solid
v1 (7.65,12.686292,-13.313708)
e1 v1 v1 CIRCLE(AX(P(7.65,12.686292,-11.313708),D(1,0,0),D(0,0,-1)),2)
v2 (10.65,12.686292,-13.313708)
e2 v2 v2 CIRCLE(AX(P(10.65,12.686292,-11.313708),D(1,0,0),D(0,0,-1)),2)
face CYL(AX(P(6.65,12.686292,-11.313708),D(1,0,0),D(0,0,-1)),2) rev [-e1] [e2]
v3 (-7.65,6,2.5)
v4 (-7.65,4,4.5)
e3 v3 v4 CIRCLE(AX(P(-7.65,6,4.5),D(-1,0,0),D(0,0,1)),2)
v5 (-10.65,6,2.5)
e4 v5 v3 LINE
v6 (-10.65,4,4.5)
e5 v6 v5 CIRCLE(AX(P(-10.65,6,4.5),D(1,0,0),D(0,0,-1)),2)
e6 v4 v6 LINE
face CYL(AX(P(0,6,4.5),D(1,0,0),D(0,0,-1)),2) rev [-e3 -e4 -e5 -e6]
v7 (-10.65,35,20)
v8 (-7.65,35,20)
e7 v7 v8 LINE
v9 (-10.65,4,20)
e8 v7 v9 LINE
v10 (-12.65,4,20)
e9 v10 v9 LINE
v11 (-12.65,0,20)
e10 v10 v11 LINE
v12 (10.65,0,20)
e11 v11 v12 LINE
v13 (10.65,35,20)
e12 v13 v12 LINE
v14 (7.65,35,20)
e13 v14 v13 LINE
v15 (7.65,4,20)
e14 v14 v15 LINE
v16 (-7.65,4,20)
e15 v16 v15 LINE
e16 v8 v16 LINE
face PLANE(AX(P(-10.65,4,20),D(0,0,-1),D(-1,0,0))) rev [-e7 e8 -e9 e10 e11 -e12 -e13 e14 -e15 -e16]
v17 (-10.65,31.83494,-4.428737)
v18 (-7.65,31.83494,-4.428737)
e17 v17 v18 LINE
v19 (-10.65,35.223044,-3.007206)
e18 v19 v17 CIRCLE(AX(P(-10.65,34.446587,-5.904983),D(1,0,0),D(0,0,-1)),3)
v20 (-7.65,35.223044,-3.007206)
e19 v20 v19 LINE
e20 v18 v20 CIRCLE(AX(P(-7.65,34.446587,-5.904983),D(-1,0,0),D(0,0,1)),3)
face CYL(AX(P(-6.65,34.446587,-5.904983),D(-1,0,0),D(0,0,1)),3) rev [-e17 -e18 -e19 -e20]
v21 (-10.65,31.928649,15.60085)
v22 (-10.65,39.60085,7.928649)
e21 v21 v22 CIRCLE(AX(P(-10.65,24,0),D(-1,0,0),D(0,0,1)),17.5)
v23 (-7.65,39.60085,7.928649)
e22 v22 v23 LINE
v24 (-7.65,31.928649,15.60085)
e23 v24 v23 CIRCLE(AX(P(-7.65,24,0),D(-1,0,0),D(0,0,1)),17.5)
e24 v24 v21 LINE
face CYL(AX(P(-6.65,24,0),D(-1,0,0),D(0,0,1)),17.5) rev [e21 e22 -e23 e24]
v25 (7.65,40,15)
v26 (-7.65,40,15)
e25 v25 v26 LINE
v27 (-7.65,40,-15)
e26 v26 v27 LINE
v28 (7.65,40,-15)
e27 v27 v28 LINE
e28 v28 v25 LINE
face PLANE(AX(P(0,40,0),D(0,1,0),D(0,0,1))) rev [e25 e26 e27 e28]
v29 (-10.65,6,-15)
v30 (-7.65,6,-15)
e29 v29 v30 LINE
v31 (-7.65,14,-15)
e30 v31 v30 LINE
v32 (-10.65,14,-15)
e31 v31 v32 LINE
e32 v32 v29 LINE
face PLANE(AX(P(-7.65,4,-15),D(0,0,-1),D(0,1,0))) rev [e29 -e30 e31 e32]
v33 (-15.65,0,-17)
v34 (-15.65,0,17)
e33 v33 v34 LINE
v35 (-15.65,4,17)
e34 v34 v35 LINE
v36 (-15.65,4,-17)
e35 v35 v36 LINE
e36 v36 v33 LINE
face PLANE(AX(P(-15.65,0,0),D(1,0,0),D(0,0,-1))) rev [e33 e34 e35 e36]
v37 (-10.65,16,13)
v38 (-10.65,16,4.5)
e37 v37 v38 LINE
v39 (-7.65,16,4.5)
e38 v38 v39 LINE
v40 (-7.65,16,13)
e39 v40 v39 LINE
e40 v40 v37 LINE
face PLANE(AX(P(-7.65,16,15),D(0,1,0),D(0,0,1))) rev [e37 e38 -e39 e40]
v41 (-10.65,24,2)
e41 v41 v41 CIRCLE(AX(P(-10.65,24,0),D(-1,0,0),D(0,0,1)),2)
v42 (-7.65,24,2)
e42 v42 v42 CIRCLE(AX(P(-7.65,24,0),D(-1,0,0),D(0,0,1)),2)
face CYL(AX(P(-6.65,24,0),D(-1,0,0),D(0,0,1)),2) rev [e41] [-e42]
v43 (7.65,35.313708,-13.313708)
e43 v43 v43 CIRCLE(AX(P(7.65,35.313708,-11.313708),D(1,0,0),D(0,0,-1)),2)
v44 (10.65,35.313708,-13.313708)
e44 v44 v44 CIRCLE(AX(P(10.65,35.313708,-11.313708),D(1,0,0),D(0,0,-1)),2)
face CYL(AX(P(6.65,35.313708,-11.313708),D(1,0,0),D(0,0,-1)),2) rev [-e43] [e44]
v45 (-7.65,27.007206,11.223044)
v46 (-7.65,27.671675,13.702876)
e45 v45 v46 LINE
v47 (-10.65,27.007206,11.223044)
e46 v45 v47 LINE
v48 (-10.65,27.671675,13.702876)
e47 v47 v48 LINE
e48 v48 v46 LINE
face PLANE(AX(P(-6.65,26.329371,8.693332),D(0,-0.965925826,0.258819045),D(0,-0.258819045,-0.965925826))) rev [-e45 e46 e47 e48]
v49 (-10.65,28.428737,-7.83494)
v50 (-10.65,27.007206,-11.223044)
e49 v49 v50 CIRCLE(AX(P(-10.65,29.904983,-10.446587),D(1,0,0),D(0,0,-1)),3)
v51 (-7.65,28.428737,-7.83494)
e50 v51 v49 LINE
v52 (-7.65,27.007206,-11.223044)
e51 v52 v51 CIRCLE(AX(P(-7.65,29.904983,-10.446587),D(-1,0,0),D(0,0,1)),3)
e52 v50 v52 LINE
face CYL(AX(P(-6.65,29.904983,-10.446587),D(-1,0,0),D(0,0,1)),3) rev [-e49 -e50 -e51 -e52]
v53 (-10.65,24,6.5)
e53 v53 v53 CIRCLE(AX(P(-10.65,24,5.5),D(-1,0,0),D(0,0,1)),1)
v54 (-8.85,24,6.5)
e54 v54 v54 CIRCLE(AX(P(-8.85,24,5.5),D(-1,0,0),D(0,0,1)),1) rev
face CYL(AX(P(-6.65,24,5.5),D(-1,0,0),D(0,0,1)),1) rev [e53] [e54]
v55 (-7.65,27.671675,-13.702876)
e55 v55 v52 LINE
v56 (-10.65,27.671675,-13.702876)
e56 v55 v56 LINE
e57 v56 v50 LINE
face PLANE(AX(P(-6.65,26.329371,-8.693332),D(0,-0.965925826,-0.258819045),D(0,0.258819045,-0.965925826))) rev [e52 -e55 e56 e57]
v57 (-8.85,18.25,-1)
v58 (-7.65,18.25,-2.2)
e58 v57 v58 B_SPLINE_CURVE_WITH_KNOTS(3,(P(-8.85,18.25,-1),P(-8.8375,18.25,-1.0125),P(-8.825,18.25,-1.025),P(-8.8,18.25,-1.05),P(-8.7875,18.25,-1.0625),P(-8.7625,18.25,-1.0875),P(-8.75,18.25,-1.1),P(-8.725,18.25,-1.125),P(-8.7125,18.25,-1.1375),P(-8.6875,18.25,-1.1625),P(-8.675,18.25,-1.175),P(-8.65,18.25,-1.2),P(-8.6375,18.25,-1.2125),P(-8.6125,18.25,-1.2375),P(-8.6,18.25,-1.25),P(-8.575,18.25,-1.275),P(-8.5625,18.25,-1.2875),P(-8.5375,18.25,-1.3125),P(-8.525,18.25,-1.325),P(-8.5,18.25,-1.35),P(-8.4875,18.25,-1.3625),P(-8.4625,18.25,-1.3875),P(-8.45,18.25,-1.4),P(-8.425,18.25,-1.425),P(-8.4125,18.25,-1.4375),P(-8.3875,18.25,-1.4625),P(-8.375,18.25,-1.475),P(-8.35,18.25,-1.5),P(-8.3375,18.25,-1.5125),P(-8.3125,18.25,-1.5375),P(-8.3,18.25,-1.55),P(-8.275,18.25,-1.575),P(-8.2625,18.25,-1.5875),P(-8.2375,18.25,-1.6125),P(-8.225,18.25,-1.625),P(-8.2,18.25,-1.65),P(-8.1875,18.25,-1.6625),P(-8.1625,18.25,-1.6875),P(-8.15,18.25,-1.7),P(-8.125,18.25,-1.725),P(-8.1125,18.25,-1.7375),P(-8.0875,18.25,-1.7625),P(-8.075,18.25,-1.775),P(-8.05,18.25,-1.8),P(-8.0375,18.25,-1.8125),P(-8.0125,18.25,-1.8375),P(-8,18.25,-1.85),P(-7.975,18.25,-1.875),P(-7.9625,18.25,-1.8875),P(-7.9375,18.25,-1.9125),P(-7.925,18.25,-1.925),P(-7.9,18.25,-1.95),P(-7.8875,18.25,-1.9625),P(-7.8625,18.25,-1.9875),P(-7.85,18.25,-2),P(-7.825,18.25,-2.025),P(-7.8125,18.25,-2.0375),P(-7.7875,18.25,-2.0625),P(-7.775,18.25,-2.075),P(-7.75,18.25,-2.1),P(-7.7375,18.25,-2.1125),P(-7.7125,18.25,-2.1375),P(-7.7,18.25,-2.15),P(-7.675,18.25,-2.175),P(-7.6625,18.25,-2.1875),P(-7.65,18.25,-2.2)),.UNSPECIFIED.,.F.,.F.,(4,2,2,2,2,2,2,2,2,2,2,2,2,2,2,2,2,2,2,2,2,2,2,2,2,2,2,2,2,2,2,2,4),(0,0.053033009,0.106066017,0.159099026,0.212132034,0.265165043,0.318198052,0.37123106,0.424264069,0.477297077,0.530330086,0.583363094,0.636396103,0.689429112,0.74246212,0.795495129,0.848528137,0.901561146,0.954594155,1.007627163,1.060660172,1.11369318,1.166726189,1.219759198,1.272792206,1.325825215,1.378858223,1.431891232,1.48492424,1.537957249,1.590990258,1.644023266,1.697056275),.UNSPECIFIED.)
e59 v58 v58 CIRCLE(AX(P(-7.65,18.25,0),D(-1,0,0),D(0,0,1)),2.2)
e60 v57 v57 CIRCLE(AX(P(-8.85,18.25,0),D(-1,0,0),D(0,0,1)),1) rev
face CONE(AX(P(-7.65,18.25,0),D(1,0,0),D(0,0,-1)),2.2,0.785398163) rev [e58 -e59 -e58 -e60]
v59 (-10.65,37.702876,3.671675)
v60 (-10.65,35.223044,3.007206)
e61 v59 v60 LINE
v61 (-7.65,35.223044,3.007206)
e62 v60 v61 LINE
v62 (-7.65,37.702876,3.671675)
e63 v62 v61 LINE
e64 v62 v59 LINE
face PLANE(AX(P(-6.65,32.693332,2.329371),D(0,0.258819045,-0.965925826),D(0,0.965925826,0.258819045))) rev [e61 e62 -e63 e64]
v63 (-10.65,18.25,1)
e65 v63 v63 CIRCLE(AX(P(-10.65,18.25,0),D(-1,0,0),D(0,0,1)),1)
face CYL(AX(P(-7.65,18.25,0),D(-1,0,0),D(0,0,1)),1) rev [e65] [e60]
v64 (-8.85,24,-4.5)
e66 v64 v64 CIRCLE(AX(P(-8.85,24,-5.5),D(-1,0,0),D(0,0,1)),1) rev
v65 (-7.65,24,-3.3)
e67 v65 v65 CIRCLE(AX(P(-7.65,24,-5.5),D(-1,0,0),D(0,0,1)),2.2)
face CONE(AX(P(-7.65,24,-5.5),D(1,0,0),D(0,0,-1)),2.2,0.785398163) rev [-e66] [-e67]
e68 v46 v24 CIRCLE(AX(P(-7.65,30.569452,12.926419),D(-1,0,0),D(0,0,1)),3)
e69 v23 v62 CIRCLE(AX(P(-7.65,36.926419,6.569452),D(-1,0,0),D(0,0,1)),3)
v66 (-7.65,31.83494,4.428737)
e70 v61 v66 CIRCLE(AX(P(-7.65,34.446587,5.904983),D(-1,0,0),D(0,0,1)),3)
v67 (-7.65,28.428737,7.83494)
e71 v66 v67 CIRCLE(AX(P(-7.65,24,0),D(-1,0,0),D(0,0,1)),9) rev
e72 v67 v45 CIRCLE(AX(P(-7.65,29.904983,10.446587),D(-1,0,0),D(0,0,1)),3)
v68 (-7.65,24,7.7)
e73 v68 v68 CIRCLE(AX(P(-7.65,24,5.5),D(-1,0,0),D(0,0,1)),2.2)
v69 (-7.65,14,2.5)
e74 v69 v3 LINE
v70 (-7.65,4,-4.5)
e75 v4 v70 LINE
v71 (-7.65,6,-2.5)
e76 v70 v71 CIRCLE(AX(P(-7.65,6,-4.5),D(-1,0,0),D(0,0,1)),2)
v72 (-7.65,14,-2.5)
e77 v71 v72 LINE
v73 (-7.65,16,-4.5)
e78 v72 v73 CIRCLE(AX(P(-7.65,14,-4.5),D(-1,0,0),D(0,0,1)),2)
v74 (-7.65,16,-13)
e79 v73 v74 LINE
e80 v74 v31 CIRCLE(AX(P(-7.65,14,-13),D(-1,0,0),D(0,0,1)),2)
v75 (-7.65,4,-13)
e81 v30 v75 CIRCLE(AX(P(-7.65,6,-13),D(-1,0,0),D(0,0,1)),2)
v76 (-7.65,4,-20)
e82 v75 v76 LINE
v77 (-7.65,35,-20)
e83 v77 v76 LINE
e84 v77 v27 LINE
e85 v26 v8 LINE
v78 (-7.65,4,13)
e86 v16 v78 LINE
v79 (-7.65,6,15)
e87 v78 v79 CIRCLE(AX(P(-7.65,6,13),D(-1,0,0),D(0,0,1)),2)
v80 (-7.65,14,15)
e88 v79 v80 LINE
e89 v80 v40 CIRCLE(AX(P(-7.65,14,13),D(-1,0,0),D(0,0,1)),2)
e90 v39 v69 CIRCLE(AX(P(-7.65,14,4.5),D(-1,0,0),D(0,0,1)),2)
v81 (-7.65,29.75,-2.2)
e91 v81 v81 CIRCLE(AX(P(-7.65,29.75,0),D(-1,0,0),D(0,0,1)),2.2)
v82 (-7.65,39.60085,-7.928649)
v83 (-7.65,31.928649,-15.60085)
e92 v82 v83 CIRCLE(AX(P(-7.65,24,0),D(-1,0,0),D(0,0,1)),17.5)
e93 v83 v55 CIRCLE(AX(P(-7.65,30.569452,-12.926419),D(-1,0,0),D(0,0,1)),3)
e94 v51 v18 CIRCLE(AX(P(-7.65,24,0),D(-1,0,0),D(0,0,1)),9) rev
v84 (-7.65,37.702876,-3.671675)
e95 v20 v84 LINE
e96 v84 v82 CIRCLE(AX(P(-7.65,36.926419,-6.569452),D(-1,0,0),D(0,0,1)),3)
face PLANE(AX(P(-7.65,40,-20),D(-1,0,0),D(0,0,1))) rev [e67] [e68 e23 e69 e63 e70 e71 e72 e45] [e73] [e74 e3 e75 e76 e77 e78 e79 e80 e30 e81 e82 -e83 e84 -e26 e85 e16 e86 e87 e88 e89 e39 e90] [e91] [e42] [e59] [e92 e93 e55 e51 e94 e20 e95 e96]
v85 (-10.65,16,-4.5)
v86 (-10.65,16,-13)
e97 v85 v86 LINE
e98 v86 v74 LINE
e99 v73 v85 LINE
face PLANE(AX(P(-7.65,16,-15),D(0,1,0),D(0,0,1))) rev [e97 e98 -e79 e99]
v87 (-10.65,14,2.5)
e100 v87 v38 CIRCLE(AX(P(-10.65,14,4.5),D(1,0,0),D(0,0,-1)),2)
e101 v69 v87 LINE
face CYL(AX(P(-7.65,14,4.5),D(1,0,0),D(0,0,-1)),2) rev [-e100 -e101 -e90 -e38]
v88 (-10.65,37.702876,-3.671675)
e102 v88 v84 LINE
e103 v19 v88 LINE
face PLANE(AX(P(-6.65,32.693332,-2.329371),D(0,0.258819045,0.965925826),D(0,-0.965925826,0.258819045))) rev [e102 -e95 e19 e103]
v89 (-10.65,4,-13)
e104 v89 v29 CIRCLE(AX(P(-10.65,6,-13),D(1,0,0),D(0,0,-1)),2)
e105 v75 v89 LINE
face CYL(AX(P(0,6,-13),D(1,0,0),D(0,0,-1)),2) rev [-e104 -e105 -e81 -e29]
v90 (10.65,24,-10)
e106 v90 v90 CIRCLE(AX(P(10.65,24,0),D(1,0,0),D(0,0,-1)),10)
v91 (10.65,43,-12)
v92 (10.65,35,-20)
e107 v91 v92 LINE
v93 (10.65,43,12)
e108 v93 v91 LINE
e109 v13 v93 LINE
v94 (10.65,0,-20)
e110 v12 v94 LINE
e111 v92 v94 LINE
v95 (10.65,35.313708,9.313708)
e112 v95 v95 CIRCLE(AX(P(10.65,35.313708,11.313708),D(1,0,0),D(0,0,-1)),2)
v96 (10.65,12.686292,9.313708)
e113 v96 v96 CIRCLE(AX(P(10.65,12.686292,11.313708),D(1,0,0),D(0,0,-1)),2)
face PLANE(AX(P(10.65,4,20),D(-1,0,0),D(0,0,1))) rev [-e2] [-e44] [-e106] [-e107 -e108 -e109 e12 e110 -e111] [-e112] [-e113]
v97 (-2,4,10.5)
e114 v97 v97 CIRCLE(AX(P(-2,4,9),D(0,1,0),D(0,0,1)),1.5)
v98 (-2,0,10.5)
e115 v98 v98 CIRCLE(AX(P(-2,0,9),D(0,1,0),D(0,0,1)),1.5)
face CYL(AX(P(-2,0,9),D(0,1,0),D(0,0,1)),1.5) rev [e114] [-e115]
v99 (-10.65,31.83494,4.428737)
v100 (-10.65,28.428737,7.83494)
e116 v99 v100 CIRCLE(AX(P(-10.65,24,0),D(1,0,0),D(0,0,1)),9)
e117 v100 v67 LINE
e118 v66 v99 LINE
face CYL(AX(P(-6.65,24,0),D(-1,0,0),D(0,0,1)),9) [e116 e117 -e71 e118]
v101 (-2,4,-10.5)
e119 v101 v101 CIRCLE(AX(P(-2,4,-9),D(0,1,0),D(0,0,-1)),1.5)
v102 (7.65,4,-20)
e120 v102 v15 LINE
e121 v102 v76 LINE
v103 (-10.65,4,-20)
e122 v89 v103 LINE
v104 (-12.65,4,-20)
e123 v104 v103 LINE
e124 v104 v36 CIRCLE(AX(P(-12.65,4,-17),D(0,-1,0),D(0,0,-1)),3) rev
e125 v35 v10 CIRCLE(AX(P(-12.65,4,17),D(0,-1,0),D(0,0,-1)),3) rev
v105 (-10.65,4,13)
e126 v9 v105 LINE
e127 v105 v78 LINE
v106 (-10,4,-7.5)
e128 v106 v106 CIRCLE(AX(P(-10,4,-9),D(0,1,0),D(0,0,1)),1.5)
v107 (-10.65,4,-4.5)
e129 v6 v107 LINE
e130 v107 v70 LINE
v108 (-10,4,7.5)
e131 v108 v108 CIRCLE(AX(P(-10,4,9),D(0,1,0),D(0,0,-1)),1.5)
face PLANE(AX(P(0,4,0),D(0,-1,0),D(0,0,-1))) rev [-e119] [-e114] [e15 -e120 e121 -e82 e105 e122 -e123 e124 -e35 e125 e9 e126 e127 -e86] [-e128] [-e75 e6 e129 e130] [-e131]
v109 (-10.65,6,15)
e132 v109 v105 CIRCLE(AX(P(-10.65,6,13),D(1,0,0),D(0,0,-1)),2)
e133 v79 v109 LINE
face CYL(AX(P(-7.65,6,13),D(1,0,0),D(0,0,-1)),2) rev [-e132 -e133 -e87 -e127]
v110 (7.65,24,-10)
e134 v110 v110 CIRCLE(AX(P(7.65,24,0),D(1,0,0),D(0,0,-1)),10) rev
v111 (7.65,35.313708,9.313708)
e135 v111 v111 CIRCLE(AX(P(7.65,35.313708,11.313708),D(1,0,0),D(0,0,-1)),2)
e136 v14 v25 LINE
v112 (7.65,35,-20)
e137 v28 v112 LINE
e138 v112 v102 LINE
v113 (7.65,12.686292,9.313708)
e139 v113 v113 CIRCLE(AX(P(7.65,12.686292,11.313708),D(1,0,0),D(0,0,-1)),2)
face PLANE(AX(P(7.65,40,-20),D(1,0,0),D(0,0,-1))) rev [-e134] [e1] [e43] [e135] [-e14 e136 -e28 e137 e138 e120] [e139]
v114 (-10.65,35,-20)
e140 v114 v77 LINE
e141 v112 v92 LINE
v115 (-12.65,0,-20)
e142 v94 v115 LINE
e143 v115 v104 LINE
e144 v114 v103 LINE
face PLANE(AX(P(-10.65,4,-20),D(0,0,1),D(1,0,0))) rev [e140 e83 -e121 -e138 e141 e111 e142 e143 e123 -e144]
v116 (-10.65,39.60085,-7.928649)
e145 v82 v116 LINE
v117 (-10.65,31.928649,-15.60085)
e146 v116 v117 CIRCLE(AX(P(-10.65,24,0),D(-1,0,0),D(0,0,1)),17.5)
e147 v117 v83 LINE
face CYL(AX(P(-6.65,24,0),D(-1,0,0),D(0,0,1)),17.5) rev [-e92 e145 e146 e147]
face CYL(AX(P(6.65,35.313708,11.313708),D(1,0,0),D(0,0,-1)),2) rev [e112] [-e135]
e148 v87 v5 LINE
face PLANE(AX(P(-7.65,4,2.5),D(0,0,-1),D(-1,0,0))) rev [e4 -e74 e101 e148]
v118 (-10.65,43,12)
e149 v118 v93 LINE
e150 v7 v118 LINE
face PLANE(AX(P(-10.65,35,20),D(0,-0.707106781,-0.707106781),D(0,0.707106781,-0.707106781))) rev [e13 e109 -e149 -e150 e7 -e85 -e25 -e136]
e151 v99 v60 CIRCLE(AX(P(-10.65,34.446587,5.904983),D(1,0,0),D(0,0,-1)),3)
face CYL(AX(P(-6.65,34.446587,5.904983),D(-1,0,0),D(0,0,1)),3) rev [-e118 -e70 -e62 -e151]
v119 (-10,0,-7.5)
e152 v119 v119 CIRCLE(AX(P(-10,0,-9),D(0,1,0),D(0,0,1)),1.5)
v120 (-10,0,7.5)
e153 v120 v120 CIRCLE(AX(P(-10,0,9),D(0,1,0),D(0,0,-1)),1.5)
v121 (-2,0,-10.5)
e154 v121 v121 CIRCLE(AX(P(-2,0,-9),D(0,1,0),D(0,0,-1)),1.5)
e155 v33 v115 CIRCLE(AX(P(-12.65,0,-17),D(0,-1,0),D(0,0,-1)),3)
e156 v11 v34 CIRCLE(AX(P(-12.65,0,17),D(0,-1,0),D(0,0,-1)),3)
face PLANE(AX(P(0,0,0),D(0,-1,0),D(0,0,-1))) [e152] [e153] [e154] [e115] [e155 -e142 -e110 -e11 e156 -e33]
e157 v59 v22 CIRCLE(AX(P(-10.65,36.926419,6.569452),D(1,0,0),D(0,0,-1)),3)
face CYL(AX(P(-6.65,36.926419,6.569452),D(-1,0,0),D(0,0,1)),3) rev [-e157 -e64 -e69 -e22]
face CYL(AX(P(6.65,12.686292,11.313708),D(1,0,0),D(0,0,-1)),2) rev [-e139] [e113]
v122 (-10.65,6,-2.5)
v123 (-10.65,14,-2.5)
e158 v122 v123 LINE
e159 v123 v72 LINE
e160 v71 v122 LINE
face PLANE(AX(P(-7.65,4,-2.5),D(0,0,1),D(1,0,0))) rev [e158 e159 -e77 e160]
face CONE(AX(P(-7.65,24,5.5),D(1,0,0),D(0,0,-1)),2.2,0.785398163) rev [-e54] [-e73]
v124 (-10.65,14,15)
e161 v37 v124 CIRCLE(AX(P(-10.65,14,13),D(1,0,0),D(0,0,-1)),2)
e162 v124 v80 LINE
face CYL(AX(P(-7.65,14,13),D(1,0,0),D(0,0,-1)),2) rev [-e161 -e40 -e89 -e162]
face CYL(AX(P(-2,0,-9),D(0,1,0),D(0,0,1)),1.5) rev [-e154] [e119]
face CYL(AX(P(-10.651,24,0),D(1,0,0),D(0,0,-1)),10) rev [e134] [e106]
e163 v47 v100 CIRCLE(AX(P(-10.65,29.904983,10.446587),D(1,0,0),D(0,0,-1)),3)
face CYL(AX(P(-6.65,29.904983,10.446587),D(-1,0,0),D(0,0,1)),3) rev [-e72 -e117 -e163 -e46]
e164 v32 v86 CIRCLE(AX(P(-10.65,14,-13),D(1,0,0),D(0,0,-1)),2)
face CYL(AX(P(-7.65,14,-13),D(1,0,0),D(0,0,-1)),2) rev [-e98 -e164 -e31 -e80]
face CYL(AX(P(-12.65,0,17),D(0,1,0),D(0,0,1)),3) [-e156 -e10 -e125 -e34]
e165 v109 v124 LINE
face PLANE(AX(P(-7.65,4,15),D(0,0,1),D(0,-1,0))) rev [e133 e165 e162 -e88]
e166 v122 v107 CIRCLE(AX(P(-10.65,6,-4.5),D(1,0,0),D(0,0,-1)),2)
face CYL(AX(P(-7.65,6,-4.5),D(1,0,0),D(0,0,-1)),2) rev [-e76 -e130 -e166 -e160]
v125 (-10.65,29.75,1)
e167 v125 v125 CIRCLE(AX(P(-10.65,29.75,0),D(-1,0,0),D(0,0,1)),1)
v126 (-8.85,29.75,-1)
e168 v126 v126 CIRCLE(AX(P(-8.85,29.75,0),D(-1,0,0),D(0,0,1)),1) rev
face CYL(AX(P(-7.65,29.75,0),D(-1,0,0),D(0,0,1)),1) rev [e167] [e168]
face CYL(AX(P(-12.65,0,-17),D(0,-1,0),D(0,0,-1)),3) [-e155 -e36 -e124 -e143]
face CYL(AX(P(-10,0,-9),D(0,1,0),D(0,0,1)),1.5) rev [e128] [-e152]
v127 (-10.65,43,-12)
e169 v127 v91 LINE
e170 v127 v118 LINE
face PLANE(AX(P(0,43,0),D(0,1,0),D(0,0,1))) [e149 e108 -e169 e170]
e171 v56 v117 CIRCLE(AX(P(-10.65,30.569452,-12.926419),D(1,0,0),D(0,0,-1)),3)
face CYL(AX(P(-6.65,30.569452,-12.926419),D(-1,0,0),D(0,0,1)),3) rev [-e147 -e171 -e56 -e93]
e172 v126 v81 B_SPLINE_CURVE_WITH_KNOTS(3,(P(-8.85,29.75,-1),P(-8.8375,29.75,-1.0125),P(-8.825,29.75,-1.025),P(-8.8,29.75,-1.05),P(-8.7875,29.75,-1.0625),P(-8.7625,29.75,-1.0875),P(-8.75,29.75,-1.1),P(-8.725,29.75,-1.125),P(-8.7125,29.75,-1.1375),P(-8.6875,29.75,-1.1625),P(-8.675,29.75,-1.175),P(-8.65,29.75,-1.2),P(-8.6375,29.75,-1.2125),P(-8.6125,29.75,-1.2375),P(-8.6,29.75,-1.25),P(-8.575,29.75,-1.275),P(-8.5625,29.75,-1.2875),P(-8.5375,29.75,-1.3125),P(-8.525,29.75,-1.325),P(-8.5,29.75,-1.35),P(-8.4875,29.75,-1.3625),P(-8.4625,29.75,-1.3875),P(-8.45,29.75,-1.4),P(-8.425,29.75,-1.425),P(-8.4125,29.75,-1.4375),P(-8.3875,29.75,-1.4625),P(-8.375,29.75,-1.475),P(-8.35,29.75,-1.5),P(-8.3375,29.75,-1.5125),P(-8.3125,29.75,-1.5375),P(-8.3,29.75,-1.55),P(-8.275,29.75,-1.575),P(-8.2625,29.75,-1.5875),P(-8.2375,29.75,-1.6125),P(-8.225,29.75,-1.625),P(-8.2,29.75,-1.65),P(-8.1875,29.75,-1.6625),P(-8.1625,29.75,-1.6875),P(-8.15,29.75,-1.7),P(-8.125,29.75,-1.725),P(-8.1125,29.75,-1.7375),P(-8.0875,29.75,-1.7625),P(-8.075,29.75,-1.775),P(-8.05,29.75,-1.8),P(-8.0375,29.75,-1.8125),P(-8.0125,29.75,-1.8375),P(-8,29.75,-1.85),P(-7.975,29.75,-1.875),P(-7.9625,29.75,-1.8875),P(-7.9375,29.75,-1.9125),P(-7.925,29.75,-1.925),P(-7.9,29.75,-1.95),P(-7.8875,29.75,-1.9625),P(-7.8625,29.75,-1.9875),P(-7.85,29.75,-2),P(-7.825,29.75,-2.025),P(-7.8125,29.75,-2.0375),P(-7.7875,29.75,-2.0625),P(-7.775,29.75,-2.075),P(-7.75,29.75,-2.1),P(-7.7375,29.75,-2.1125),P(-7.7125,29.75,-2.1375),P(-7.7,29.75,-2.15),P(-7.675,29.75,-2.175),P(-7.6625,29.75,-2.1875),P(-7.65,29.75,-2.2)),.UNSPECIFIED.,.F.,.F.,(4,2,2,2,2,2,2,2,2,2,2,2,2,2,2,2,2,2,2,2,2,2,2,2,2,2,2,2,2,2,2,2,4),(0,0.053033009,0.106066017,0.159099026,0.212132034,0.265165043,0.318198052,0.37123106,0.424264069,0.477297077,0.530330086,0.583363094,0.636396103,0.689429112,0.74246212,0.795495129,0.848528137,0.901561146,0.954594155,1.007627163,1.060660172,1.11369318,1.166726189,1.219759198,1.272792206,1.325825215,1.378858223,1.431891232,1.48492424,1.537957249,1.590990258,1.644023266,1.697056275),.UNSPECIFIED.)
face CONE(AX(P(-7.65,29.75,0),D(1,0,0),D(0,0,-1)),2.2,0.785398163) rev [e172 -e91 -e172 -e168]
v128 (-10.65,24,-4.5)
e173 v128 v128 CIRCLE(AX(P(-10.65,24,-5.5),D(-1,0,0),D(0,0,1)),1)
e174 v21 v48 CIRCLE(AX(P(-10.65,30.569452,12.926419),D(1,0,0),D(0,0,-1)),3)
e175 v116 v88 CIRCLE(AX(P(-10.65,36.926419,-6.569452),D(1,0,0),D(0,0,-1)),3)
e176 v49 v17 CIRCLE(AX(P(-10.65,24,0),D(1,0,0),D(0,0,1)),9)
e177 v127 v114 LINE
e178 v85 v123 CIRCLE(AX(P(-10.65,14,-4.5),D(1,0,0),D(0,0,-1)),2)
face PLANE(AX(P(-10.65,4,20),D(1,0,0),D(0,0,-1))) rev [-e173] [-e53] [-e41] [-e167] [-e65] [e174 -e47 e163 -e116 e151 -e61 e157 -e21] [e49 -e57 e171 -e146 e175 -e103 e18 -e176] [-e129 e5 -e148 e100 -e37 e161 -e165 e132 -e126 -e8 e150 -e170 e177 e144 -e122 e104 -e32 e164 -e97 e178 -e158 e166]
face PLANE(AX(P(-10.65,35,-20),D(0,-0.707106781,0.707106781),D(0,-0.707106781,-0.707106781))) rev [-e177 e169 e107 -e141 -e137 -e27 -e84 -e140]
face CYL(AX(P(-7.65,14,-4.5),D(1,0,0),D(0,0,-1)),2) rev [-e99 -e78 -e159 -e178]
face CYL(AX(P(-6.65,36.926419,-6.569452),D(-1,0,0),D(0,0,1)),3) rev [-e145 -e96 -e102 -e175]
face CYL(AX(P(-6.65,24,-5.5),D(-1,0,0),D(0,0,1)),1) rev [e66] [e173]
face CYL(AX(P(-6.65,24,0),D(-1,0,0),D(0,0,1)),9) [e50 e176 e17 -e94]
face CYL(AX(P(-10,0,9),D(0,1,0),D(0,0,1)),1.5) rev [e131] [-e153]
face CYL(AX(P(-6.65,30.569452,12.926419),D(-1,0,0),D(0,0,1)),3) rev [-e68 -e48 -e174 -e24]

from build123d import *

# Parameters (mm, degrees)
SKETCH_1_W          = 21.3
SKETCH_1_H          = 40
EXTRUDE_1_DEPTH     = 4
SKETCH_2_W          = 3
SKETCH_2_H          = 40
EXTRUDE_2_DEPTH     = 36
SKETCH_3_W          = 21.3
SKETCH_3_H          = 40
EXTRUDE_3_DEPTH     = 3
CUT_EXTRUDE_1_REACH = 53.987
SKETCH_4_R          = 10
CUT_EXTRUDE_2_DEPTH = 52.98740232
SKETCH_13_W         = 40
SKETCH_13_H         = 4
EXTRUDE_4_DEPTH     = 5
SKETCH_6_R          = 1.5
CUT_EXTRUDE_3_DEPTH = 47.539472494
SKETCH_7_R          = 2
CUT_EXTRUDE_4_DEPTH = 4
SKETCH_9_R          = 2
SKETCH_9_R_2        = 1
CUT_EXTRUDE_6_DEPTH = 4
CUT_EXTRUDE_7_DEPTH = 4
FILLET_1_R          = 3
SKETCH_11_W         = 12.5
SKETCH_11_H         = 12
CUT_EXTRUDE_8_DEPTH = 3
FILLET_2_R          = 2
SKETCH_12_R         = 1
CUT_EXTRUDE_9_DEPTH = 3
CHAMFER_1_SIZE      = 1.2
FILLET_3_R          = 3


with BuildPart() as part:
    # 草图1 → 凸台-拉伸1 (new body)
    with BuildSketch(Plane(origin=(0, 0, 0), x_dir=(1, 0, 0), z_dir=(0, 1, 0))):
        Rectangle(SKETCH_1_W, SKETCH_1_H)
    extrude(amount=EXTRUDE_1_DEPTH)

    # 草图2 → 凸台-拉伸2 (add)
    with BuildSketch(Plane(origin=(0, 4, 0), x_dir=(1, 0, 0), z_dir=(0, 1, 0))):
        with Locations((-9.15, 0)):
            Rectangle(SKETCH_2_W, SKETCH_2_H)
        with Locations((9.15, 0)):
            Rectangle(SKETCH_2_W, SKETCH_2_H)
    extrude(amount=EXTRUDE_2_DEPTH)

    # 草图3 → 凸台-拉伸3 (add)
    with BuildSketch(Plane(origin=(0, 40, 0), x_dir=(1, 0, 0), z_dir=(0, 1, 0))):
        Rectangle(SKETCH_3_W, SKETCH_3_H)
    extrude(amount=EXTRUDE_3_DEPTH)

    # 草图4 → 切除-拉伸1 (cut, up to next)
    with BuildSketch(Plane(origin=(10.65, 0, 0), x_dir=(0, 0, -1), z_dir=(1, 0, 0)), mode=Mode.PRIVATE) as cut_extrude_1_sk1:
        with Locations((0, 24)):
            Circle(SKETCH_4_R)
    cut_extrude_1_tool1 = extrude(cut_extrude_1_sk1.sketch, amount=-CUT_EXTRUDE_1_REACH, mode=Mode.PRIVATE) & part.part
    add(cut_extrude_1_tool1.solids().sort_by_distance((10.65, 24, 0))[0], mode=Mode.SUBTRACT)

    # 草图5 → 切除-拉伸2 (cut, through all)
    with BuildSketch(Plane(origin=(10.65, 0, 0), x_dir=(0, 0, -1), z_dir=(1, 0, 0))):
        Polygon((-20, 35), (-12, 43), (-20, 43), align=None)
        Polygon((20, 35), (20, 43), (12, 43), align=None)
    extrude(amount=-CUT_EXTRUDE_2_DEPTH, mode=Mode.SUBTRACT)

    # 草图13 → 凸台-拉伸4 (add)
    with BuildSketch(Plane.ZY.offset(10.65)):
        with Locations((0, 2)):
            Rectangle(SKETCH_13_W, SKETCH_13_H)
    extrude(amount=EXTRUDE_4_DEPTH)

    # 草图6 → 切除-拉伸3 (cut, through all)
    with BuildSketch(Plane(origin=(0, 4, 0), x_dir=(1, 0, 0), z_dir=(0, 1, 0))):
        with Locations(Location((-10, 9, 0), (0, 0, 270))):
            Circle(SKETCH_6_R)
        with Locations(Location((-2, 9, 0), (0, 0, 90))):
            Circle(SKETCH_6_R)
        with Locations(Location((-2, -9, 0), (0, 0, 270))):
            Circle(SKETCH_6_R)
        with Locations(Location((-10, -9, 0), (0, 0, 244.320711381))):
            Circle(SKETCH_6_R)
    extrude(amount=-CUT_EXTRUDE_3_DEPTH, mode=Mode.SUBTRACT)

    # 草图7 → 切除-拉伸4 (cut)
    with BuildSketch(Plane(origin=(10.65, 0, 0), x_dir=(0, 0, -1), z_dir=(1, 0, 0))):
        with Locations((-11.313708499, 35.313708499)):
            Circle(SKETCH_7_R)
        with Locations((11.313708499, 35.313708499)):
            Circle(SKETCH_7_R)
        with Locations((11.313708499, 12.686291501)):
            Circle(SKETCH_7_R)
        with Locations((-11.313708499, 12.686291501)):
            Circle(SKETCH_7_R)
    extrude(amount=-CUT_EXTRUDE_4_DEPTH, mode=Mode.SUBTRACT)

    # 草图9 → 切除-拉伸6 (cut)
    with BuildSketch(Plane.ZY.offset(10.65)):
        with Locations((0, 24)):
            Circle(SKETCH_9_R)
        with Locations((-5.5, 24)):
            Circle(SKETCH_9_R_2)
        with Locations((5.5, 24)):
            Circle(SKETCH_9_R_2)
    extrude(amount=-CUT_EXTRUDE_6_DEPTH, mode=Mode.SUBTRACT)

    # 草图10 → 切除-拉伸7 (cut)
    with BuildSketch(Plane.ZY.offset(10.65)):
        with BuildLine():
            Line((-2.329371406, 32.693332437), (-4.529333289, 40.90370196))
            ThreePointArc((-4.529333289, 40.90370196), (-12.374368671, 36.374368671), (-16.90370196, 28.529333289))
            Line((-16.90370196, 28.529333289), (-8.693332437, 26.329371406))
            ThreePointArc((-8.693332437, 26.329371406), (-6.363961031, 30.363961031), (-2.329371406, 32.693332437))
        make_face()
        with BuildLine():
            Line((2.329371406, 32.693332437), (4.529333289, 40.90370196))
            ThreePointArc((4.529333289, 40.90370196), (12.374368671, 36.374368671), (16.90370196, 28.529333289))
            Line((16.90370196, 28.529333289), (8.693332437, 26.329371406))
            ThreePointArc((8.693332437, 26.329371406), (6.363961031, 30.363961031), (2.329371406, 32.693332437))
        make_face()
    extrude(amount=-CUT_EXTRUDE_7_DEPTH, mode=Mode.SUBTRACT)

    # 圆角1
    # the kernel refuses this fillet: 3 mm, written as the material it adds along each edge
    with BuildSketch(Plane(origin=(-10.65, 26.329371406, -8.693332437), x_dir=(0, 0.9256147934109583, 0.37846697903355925), z_dir=(1, 0, 0)), Plane(origin=(-10.65, 32.693332437, 2.329371406), x_dir=(0, -0.3784669790335633, 0.925614793410957), z_dir=(1, 0, 0))) as fillet_1_piece_1:
        with BuildLine():
            CenterArc((2.646090142, -2.976089089), FILLET_1_R, 97.238756093, 75.522487814)
            Line((-0.329998947, -2.598076211), (0, 0))
            ThreePointArc((0, 0), (1.134038632, -0.071732734), (2.268077265, 0))
        make_face()
    extrude(amount=3)
    with BuildSketch(Plane(origin=(-10.65, 32.693332437, -2.329371406), x_dir=(0, 0.9659258262890681, -0.25881904510252196), z_dir=(1, 0, 0)), Plane(origin=(-10.65, 26.329371406, 8.693332437), x_dir=(0, 0.25881904510252085, 0.9659258262890684), z_dir=(1, 0, 0))) as fillet_1_piece_2:
        with BuildLine():
            CenterArc((2.618950039, -3), FILLET_1_R, 90, 75.522487814)
            ThreePointArc((-0.285787471, -2.25), (-0.071732734, -1.134038632), (0, 0))
            Line((0, 0), (2.618950039, 0))
        make_face()
    extrude(amount=3)
    with BuildSketch(Plane(origin=(-10.65, 28.529333289, 16.90370196), x_dir=(0, 0.9337662406897771, -0.3578835114224755), z_dir=(1, 0, 0))) as fillet_1_piece_3:
        with BuildLine():
            CenterArc((3.328398071, -2.983727989), FILLET_1_R, 84.02972802, 101.940543961)
            Line((0.344670082, -3.295765308), (0, 0))
            ThreePointArc((0, 0), (1.820217695, 0.094920065), (3.64043539, 0))
        make_face()
    extrude(amount=3)
    with BuildSketch(Plane(origin=(-10.65, 40.90370196, 4.529333289), x_dir=(0, -0.35788351142247776, 0.9337662406897762), z_dir=(1, 0, 0))) as fillet_1_piece_4_section:
        with BuildLine():
            CenterArc((3.328398071, 2.983727989), FILLET_1_R, 174.02972802, 101.940543961)
            Line((0.344670082, 3.295765308), (0, 0))
            ThreePointArc((0, 0), (1.820217695, -0.094920065), (3.64043539, 0))
        make_face()
    fillet_1_piece_4 = extrude(amount=4, mode=Mode.PRIVATE)
    fillet_1_piece_4 = split(fillet_1_piece_4, bisect_by=Plane(origin=(-7.65, 39.487850141, 4.896179804), z_dir=(-1, 0, 0)), keep=Keep.TOP, mode=Mode.PRIVATE)
    fillet_1_piece_4 = split(fillet_1_piece_4, bisect_by=Plane(origin=(-9.15, 40, 4.896179804), z_dir=(0, -1, 0)), keep=Keep.TOP, mode=Mode.PRIVATE)
    add(fillet_1_piece_4)
    with BuildSketch(Plane(origin=(-10.65, 40.90370196, 4.529333289), x_dir=(0, -0.35788351142247776, 0.9337662406897762), z_dir=(1, 0, 0))) as fillet_1_piece_5_section:
        with BuildLine():
            CenterArc((3.328398071, 2.983727989), FILLET_1_R, 174.02972802, 101.940543961)
            Line((0.344670082, 3.295765308), (0, 0))
            ThreePointArc((0, 0), (1.820217695, -0.094920065), (3.64043539, 0))
        make_face()
    fillet_1_piece_5 = extrude(amount=4, mode=Mode.PRIVATE)
    fillet_1_piece_5 = split(fillet_1_piece_5, bisect_by=Plane(origin=(-7.65, 40.338801321, 5.357941996), z_dir=(-1, 0, 0)), keep=Keep.TOP, mode=Mode.PRIVATE)
    fillet_1_piece_5 = split(fillet_1_piece_5, bisect_by=Plane(origin=(-9.15, 40, 5.357941996), z_dir=(0, 1, 0)), keep=Keep.TOP, mode=Mode.PRIVATE)
    add(fillet_1_piece_5)
    with BuildSketch(Plane(origin=(-10.65, 40.90370196, 4.529333289), x_dir=(0, -0.35788351142247776, 0.9337662406897762), z_dir=(1, 0, 0))) as fillet_1_piece_6_section:
        with BuildLine():
            CenterArc((3.328398071, 2.983727989), FILLET_1_R, 174.02972802, 101.940543961)
            Line((0.344670082, 3.295765308), (0, 0))
            ThreePointArc((0, 0), (1.820217695, -0.094920065), (3.64043539, 0))
        make_face()
    fillet_1_piece_6 = extrude(amount=4, mode=Mode.PRIVATE)
    fillet_1_piece_6 = split(fillet_1_piece_6, bisect_by=Plane(origin=(-7.65, 40.338801321, 5.357941996), z_dir=(1, 0, 0)), keep=Keep.TOP, mode=Mode.PRIVATE)
    fillet_1_piece_6 = split(fillet_1_piece_6, bisect_by=Plane(origin=(-7.15, 40, 5.357941996), z_dir=(0, 1, 0)), keep=Keep.TOP, mode=Mode.PRIVATE)
    add(fillet_1_piece_6)
    with BuildSketch(Plane(origin=(-10.65, 40.90370196, 4.529333289), x_dir=(0, -0.35788351142247776, 0.9337662406897762), z_dir=(1, 0, 0))) as fillet_1_piece_7_section:
        with BuildLine():
            CenterArc((3.328398071, 2.983727989), FILLET_1_R, 174.02972802, 101.940543961)
            Line((0.344670082, 3.295765308), (0, 0))
            ThreePointArc((0, 0), (1.820217695, -0.094920065), (3.64043539, 0))
        make_face()
    fillet_1_piece_7 = extrude(amount=13.101088476, mode=Mode.PRIVATE)
    fillet_1_piece_7 = split(fillet_1_piece_7, bisect_by=Plane(origin=(-2.099455762, 40, 5.357941996), z_dir=(0, 1, 0)), keep=Keep.TOP, mode=Mode.PRIVATE)
    fillet_1_piece_7 = split(fillet_1_piece_7, bisect_by=Plane(origin=(-6.65, 40.338801321, 5.357941996), z_dir=(1, 0, 0)), keep=Keep.TOP, mode=Mode.PRIVATE)
    add(fillet_1_piece_7)
    with BuildSketch(Plane(origin=(-10.65, 40.90370196, -4.529333289), x_dir=(0, -0.9659258262890679, 0.25881904510252246), z_dir=(1, 0, 0))) as fillet_1_piece_8_section:
        with BuildLine():
            CenterArc((3.313739041, 3), FILLET_1_R, 168.059456039, 101.940543961)
            ThreePointArc((0.378650567, 3.620689655), (0.094920065, 1.820217695), (0, 0))
            Line((0, 0), (3.313739041, 0))
        make_face()
    fillet_1_piece_8 = extrude(amount=4, mode=Mode.PRIVATE)
    fillet_1_piece_8 = split(fillet_1_piece_8, bisect_by=Plane(origin=(-7.65, 39.487850141, -4.896179804), z_dir=(-1, 0, 0)), keep=Keep.TOP, mode=Mode.PRIVATE)
    fillet_1_piece_8 = split(fillet_1_piece_8, bisect_by=Plane(origin=(-9.15, 40, -4.896179804), z_dir=(0, -1, 0)), keep=Keep.TOP, mode=Mode.PRIVATE)
    add(fillet_1_piece_8)
    with BuildSketch(Plane(origin=(-10.65, 40.90370196, -4.529333289), x_dir=(0, -0.9659258262890679, 0.25881904510252246), z_dir=(1, 0, 0))) as fillet_1_piece_9_section:
        with BuildLine():
            CenterArc((3.313739041, 3), FILLET_1_R, 168.059456039, 101.940543961)
            ThreePointArc((0.378650567, 3.620689655), (0.094920065, 1.820217695), (0, 0))
            Line((0, 0), (3.313739041, 0))
        make_face()
    fillet_1_piece_9 = extrude(amount=4, mode=Mode.PRIVATE)
    fillet_1_piece_9 = split(fillet_1_piece_9, bisect_by=Plane(origin=(-7.65, 40.338801321, -5.357941996), z_dir=(-1, 0, 0)), keep=Keep.TOP, mode=Mode.PRIVATE)
    fillet_1_piece_9 = split(fillet_1_piece_9, bisect_by=Plane(origin=(-9.15, 40, -5.357941996), z_dir=(0, 1, 0)), keep=Keep.TOP, mode=Mode.PRIVATE)
    add(fillet_1_piece_9)
    with BuildSketch(Plane(origin=(-10.65, 40.90370196, -4.529333289), x_dir=(0, -0.9659258262890679, 0.25881904510252246), z_dir=(1, 0, 0))) as fillet_1_piece_10_section:
        with BuildLine():
            CenterArc((3.313739041, 3), FILLET_1_R, 168.059456039, 101.940543961)
            ThreePointArc((0.378650567, 3.620689655), (0.094920065, 1.820217695), (0, 0))
            Line((0, 0), (3.313739041, 0))
        make_face()
    fillet_1_piece_10 = extrude(amount=4, mode=Mode.PRIVATE)
    fillet_1_piece_10 = split(fillet_1_piece_10, bisect_by=Plane(origin=(-7.65, 40.338801321, -5.357941996), z_dir=(1, 0, 0)), keep=Keep.TOP, mode=Mode.PRIVATE)
    fillet_1_piece_10 = split(fillet_1_piece_10, bisect_by=Plane(origin=(-7.15, 40, -5.357941996), z_dir=(0, 1, 0)), keep=Keep.TOP, mode=Mode.PRIVATE)
    add(fillet_1_piece_10)
    with BuildSketch(Plane(origin=(-10.65, 40.90370196, -4.529333289), x_dir=(0, -0.9659258262890679, 0.25881904510252246), z_dir=(1, 0, 0))) as fillet_1_piece_11_section:
        with BuildLine():
            CenterArc((3.313739041, 3), FILLET_1_R, 168.059456039, 101.940543961)
            ThreePointArc((0.378650567, 3.620689655), (0.094920065, 1.820217695), (0, 0))
            Line((0, 0), (3.313739041, 0))
        make_face()
    fillet_1_piece_11 = extrude(amount=13.101088476, mode=Mode.PRIVATE)
    fillet_1_piece_11 = split(fillet_1_piece_11, bisect_by=Plane(origin=(-6.65, 40.338801321, -5.357941996), z_dir=(1, 0, 0)), keep=Keep.TOP, mode=Mode.PRIVATE)
    fillet_1_piece_11 = split(fillet_1_piece_11, bisect_by=Plane(origin=(-2.099455762, 40, -5.357941996), z_dir=(0, 1, 0)), keep=Keep.TOP, mode=Mode.PRIVATE)
    add(fillet_1_piece_11)
    with BuildSketch(Plane(origin=(-10.65, 28.529333289, -16.90370196), x_dir=(0, -0.25881904510252, 0.9659258262890684), z_dir=(1, 0, 0))) as fillet_1_piece_12:
        with BuildLine():
            CenterArc((3.313739041, -3), FILLET_1_R, 90, 101.940543961)
            ThreePointArc((0.378650567, -3.620689655), (0.094920065, -1.820217695), (0, 0))
            Line((0, 0), (3.313739041, 0))
        make_face()
    extrude(amount=3)

    # 草图11 → 切除-拉伸8 (cut)
    with BuildSketch(Plane.ZY.offset(10.65)):
        with Locations((-8.75, 10)):
            Rectangle(SKETCH_11_W, SKETCH_11_H)
        with Locations((8.75, 10)):
            Rectangle(SKETCH_11_W, SKETCH_11_H)
    extrude(amount=-CUT_EXTRUDE_8_DEPTH, mode=Mode.SUBTRACT)

    # 圆角2
    fillet_2_edges = [part.edges().sort_by_distance(p)[0] for p in [
        (-9.15, 4, -2.5),
        (-9.15, 4, -15),
        (-9.15, 16, -15),
        (-9.15, 16, -2.5),
        (-9.15, 4, 15),
        (-9.15, 16, 15),
        (-9.15, 4, 2.5),
        (-9.15, 16, 2.5),
    ]]
    fillet(fillet_2_edges, radius=FILLET_2_R)

    # 草图12 → 切除-拉伸9 (cut)
    with BuildSketch(Plane.ZY.offset(10.65)):
        with Locations((0, 29.75)):
            Circle(SKETCH_12_R)
        with Locations((0, 18.25)):
            Circle(SKETCH_12_R)
    extrude(amount=-CUT_EXTRUDE_9_DEPTH, mode=Mode.SUBTRACT)

    # 倒角1
    chamfer_1_edges = [part.edges().sort_by_distance(p)[0] for p in [
        (-7.65, 24, 4.5),
        (-7.65, 24, -6.5),
        (-7.65, 29.75, -1),
        (-7.65, 18.25, -1),
    ]]
    chamfer(chamfer_1_edges, length=CHAMFER_1_SIZE)

    # 圆角3
    fillet_3_edges = [part.edges().sort_by_distance(p)[0] for p in [
        (-15.65, 2, -20),
        (-15.65, 2, 20),
    ]]
    fillet(fillet_3_edges, radius=FILLET_3_R)


solid = part.part
